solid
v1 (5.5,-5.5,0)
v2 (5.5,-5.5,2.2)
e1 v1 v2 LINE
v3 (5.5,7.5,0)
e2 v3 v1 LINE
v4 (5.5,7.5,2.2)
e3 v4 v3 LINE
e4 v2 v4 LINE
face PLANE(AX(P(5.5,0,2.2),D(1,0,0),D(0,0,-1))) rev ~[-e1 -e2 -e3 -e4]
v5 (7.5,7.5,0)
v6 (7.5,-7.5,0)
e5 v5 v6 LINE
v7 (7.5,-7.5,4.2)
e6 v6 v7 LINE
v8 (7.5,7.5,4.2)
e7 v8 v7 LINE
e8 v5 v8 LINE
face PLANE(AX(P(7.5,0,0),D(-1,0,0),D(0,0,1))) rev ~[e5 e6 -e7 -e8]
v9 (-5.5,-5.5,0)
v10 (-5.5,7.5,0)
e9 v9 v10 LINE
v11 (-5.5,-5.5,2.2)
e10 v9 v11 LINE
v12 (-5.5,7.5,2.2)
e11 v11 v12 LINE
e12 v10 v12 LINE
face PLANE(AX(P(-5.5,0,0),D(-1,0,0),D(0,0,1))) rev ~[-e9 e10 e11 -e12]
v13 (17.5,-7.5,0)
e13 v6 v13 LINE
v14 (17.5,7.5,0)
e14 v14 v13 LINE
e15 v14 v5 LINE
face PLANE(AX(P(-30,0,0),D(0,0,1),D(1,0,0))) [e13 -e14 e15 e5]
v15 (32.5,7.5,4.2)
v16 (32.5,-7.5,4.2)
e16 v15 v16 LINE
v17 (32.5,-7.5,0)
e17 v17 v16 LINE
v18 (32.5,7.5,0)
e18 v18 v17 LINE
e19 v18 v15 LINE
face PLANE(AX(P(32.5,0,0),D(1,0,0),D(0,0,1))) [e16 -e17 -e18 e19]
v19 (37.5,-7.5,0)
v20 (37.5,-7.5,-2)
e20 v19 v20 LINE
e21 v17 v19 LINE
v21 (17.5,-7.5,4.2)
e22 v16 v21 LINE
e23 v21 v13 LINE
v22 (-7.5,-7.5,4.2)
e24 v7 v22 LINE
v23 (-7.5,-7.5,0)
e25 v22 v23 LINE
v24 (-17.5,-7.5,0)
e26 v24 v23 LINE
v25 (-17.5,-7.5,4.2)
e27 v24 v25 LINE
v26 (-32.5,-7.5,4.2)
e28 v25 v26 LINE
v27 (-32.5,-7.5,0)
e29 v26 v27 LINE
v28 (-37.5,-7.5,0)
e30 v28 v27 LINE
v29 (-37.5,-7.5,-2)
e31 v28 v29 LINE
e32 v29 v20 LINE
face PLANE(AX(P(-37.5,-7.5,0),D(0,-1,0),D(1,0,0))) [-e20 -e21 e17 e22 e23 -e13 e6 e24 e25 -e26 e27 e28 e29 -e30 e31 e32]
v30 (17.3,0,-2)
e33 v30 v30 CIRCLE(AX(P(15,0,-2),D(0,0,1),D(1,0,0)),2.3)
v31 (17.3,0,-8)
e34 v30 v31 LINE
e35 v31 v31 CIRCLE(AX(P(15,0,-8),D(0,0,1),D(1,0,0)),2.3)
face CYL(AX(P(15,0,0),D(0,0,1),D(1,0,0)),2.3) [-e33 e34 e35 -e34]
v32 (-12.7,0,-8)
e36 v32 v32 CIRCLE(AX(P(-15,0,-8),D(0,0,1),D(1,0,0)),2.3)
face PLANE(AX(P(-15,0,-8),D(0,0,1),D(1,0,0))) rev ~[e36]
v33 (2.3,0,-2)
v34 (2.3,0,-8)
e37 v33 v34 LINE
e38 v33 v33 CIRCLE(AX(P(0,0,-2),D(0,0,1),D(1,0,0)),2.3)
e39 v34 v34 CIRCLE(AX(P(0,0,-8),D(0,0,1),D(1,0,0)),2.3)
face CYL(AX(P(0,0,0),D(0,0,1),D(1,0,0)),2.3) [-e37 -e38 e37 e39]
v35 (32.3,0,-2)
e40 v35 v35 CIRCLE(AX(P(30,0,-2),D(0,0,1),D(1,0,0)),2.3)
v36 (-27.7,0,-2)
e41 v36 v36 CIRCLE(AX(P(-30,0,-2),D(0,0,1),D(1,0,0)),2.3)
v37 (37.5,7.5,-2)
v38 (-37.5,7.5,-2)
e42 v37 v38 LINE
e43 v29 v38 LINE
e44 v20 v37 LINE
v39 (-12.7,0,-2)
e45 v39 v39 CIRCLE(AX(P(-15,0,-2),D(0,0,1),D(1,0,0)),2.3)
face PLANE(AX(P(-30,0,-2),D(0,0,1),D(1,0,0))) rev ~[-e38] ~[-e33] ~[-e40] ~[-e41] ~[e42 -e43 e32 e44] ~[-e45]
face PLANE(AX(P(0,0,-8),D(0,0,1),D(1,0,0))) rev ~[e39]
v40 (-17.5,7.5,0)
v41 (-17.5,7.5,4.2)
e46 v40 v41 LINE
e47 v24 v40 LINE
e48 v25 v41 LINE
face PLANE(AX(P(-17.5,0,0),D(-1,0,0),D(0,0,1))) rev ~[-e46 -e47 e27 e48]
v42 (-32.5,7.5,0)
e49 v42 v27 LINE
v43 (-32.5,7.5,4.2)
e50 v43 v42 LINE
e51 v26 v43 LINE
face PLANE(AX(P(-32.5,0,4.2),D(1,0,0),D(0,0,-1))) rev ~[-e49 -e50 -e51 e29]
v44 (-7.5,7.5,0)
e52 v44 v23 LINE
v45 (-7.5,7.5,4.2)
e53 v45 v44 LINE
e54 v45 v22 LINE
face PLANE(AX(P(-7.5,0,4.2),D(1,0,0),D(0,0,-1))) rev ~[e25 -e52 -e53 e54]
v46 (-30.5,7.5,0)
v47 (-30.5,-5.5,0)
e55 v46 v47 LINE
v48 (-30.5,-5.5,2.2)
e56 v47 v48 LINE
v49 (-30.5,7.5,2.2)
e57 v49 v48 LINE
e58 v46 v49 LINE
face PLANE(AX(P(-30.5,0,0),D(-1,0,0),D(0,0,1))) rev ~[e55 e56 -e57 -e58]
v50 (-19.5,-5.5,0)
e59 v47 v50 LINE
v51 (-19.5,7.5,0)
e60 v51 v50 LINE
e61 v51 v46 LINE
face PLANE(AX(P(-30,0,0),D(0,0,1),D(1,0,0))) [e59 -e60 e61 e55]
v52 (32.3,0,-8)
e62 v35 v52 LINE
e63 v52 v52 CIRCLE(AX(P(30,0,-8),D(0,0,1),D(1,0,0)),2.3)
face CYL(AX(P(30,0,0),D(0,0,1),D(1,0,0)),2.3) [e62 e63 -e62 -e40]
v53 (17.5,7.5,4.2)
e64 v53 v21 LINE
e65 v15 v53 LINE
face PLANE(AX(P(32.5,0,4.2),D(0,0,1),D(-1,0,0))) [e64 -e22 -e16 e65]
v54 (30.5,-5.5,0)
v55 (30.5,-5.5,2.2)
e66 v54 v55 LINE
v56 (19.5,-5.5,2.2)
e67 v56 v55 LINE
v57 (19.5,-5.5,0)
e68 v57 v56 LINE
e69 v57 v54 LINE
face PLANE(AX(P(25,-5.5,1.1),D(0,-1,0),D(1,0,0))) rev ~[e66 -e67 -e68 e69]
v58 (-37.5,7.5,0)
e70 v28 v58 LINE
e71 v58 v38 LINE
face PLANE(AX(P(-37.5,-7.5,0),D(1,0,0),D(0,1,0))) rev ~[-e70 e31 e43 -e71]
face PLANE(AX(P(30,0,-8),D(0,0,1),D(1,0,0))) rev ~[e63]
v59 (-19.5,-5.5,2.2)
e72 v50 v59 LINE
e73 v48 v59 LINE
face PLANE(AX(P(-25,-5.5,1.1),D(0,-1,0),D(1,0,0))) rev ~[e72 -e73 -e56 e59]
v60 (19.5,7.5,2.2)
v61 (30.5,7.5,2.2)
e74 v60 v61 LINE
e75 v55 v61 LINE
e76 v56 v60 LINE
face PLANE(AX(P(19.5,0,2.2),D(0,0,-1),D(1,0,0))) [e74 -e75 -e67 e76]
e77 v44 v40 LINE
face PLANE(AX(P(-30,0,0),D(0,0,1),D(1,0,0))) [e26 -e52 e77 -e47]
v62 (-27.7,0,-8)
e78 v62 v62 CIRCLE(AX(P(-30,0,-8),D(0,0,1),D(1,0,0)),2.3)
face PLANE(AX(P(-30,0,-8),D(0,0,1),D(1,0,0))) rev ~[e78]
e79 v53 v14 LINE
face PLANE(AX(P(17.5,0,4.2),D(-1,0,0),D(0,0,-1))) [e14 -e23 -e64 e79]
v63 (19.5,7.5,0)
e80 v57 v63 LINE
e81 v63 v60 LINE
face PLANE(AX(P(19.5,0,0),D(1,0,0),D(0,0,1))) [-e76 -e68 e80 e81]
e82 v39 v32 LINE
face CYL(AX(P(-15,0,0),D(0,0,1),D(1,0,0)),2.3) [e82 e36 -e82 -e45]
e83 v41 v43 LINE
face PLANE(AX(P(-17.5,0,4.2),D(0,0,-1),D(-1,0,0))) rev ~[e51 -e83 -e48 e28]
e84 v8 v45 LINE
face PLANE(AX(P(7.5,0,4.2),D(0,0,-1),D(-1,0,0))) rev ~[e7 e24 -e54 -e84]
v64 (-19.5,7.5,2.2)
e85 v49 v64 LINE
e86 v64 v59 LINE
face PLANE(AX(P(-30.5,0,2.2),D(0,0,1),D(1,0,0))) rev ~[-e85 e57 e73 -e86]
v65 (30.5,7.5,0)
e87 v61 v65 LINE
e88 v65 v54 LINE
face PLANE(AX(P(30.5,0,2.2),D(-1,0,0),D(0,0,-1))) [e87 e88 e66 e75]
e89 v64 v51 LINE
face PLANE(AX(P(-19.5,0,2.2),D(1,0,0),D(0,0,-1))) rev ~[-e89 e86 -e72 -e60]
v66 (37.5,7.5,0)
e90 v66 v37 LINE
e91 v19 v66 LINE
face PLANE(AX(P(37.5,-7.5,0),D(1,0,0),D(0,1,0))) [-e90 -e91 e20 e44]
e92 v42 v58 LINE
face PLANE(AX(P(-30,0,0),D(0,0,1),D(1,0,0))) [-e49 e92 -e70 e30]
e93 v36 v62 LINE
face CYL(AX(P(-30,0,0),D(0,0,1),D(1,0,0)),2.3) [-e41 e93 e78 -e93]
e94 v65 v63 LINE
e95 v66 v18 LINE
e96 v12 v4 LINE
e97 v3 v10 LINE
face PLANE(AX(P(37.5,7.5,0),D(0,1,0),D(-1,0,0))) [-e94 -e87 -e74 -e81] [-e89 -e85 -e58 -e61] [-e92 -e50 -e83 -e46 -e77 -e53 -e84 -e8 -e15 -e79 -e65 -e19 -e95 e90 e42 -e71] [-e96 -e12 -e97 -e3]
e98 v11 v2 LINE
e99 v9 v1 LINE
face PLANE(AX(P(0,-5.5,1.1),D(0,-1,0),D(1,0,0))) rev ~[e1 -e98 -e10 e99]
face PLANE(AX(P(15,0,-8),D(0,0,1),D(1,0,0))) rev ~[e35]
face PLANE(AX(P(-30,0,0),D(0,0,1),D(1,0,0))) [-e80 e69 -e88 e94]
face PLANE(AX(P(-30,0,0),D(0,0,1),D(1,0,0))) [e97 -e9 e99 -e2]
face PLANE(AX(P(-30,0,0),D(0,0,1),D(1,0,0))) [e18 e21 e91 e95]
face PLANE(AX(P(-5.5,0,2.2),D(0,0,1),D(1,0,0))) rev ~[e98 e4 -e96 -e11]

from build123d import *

# Parameters (mm, degrees)
F0_W     = 15
F0_H     = 15
F0_R     = 2.3
F1_DEPTH = 2
F2_DEPTH = 8
F4_DEPTH = 7.5
F5_START = 5.5
F3_W     = 11
F3_H     = 2.2
F5_DEPTH = 2


# Not quite as in the source:
# - a feature names something its author has since deleted; it is built from what else it names


with BuildPart() as f1:
    # F0 (on Top) → F1 (new body)
    with BuildSketch(Plane.XY):
        with Locations((-30, 0)):
            Rectangle(F0_W, F0_H)
        with Locations((-30, 0)):
            Circle(F0_R, mode=Mode.SUBTRACT)
        with Locations((-15, 0)):
            Rectangle(F0_W, F0_H)
        with Locations((-15, 0)):
            Circle(F0_R, mode=Mode.SUBTRACT)
        Rectangle(F0_W, F0_H)
        Circle(F0_R, mode=Mode.SUBTRACT)
        with Locations((15, 0)):
            Rectangle(F0_W, F0_H)
        with Locations((15, 0)):
            Circle(F0_R, mode=Mode.SUBTRACT)
        with Locations((30, 0)):
            Rectangle(F0_W, F0_H)
        with Locations((30, 0)):
            Circle(F0_R, mode=Mode.SUBTRACT)
    extrude(amount=-F1_DEPTH)

    # F0 (on Top) → F2 (join)
    with BuildSketch(Plane.XY):
        with Locations((-15, 0)):
            Circle(F0_R)
        with Locations((-30, 0)):
            Circle(F0_R)
        Circle(F0_R)
        with Locations((15, 0)):
            Circle(F0_R)
        with Locations((30, 0)):
            Circle(F0_R)
    extrude(amount=-F2_DEPTH)

    # F3 (on Front) → F4 (join, symmetric)
    with BuildSketch(Plane.XZ):
        Polygon((-32.5, 4.2), (-32.5, 0), (-30.5, 0), (-30.5, 2.2), (-19.5, 2.2), (-19.5, 0), (-17.5, 0), (-17.5, 4.2), align=None)
        Polygon((5.5, 2.2), (5.5, 0), (7.5, 0), (7.5, 4.2), (-7.5, 4.2), (-7.5, 0), (-5.5, 0), (-5.5, 2.2), align=None)
        Polygon((30.5, 2.2), (30.5, 0), (32.5, 0), (32.5, 4.2), (17.5, 4.2), (17.5, 0), (19.5, 0), (19.5, 2.2), align=None)
    extrude(amount=F4_DEPTH, both=True)

    # F3 (on Front) → F5 (join)
    with BuildSketch(Plane.XZ.offset(F5_START)):
        with Locations((-25, 1.1)):
            Rectangle(F3_W, F3_H)
        with Locations((0, 1.1)):
            Rectangle(F3_W, F3_H)
        with Locations((25, 1.1)):
            Rectangle(F3_W, F3_H)
    extrude(amount=F5_DEPTH)


solid = f1.part
